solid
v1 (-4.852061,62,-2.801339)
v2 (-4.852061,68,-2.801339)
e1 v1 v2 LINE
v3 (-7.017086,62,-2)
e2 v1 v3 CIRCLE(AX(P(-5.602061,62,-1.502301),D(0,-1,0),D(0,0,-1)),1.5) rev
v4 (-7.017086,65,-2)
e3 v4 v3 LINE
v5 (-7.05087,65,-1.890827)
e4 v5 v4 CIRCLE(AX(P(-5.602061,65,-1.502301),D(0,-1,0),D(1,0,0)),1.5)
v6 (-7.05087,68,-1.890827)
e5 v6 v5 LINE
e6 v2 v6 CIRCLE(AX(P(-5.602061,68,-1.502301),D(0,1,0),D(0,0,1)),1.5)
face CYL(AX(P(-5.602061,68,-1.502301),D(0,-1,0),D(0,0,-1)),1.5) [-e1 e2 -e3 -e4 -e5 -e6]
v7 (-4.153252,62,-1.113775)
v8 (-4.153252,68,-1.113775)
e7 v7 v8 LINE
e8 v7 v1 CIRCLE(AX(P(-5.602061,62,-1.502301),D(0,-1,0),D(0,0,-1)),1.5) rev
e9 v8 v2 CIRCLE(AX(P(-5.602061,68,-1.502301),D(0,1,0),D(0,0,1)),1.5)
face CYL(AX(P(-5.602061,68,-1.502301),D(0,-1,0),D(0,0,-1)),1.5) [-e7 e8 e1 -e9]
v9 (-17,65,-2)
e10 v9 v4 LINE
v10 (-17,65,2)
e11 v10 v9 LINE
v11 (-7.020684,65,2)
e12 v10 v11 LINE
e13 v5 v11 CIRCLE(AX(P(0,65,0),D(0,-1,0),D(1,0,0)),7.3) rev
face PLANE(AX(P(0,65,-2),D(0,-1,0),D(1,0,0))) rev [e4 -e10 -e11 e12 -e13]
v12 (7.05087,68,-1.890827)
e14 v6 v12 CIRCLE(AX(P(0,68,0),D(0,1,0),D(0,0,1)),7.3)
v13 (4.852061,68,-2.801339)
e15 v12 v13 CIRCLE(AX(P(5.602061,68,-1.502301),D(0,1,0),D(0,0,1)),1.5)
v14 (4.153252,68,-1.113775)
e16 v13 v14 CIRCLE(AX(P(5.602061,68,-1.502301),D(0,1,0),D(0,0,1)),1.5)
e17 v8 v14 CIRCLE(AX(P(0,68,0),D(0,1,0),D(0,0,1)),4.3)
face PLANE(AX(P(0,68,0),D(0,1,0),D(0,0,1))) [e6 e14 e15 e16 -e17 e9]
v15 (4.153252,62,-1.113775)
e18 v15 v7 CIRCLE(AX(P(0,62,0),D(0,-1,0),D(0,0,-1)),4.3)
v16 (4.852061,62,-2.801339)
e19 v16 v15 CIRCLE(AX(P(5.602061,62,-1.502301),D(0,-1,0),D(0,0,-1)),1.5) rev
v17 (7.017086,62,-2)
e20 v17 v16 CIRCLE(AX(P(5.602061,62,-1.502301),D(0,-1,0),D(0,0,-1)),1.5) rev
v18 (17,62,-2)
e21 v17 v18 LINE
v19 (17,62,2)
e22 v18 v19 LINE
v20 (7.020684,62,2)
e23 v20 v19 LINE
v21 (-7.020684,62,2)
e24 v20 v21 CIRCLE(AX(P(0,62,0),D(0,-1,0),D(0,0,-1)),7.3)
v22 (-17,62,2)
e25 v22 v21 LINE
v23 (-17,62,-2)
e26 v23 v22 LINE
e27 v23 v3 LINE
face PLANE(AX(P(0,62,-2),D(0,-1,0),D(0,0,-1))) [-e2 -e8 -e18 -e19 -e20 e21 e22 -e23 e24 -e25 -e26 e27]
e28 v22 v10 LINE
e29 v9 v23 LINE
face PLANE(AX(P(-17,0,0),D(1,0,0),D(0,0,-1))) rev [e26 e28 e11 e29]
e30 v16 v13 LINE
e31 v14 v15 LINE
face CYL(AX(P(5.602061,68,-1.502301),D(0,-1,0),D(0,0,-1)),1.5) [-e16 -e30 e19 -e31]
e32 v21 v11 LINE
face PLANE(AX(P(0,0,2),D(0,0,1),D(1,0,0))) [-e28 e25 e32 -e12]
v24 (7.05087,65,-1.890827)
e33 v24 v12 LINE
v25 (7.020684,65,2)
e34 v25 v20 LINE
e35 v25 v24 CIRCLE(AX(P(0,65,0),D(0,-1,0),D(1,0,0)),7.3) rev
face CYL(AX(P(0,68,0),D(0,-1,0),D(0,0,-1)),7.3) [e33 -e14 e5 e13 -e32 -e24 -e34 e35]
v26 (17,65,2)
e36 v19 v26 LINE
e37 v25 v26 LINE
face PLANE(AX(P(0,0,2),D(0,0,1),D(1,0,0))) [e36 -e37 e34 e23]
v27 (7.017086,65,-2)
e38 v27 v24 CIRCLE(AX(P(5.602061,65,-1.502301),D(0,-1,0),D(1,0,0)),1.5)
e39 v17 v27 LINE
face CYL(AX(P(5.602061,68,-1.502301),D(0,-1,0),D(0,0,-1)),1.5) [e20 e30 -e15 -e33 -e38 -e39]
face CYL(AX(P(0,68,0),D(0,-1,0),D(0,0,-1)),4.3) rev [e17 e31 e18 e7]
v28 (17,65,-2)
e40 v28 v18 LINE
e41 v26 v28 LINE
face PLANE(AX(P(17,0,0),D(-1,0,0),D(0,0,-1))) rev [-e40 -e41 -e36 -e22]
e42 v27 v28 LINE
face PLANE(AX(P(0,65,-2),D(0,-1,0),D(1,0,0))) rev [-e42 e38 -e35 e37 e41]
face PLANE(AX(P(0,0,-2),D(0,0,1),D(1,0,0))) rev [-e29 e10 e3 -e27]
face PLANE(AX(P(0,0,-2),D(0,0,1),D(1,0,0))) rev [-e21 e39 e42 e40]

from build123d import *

# Parameters (mm, degrees)
SKETCH1_W                = 30
SKETCH1_H                = 30
BOSS_EXTRUDE1_DEPTH      = 5
SKETCH2_W                = 10
SKETCH2_H                = 10
BOSS_EXTRUDE2_DEPTH      = 50
SKETCH3_W                = 10
SKETCH3_H                = 3
SKETCH3_W_2              = 5
SKETCH3_H_2              = 7
SKETCH3_H_3              = 5
BOSS_EXTRUDE3_DEPTH      = 2
BOSS_EXTRUDE4_DEPTH      = 3
BOSS_EXTRUDE4_DEPTH_BACK = 5
SKETCH4_R                = 7.3
SKETCH4_R_2              = 4.3
CUT_EXTRUDE1_DEPTH       = 6
CUT_EXTRUDE1_DEPTH_BACK  = 5
SKETCH6_R                = 4.3
FILLET1_R                = 1.5
FILLET2_R                = 1.5
FILLET3_R                = 2
SKETCH7_W                = 39.438883959
SKETCH7_H                = 36.533940166
CUT_EXTRUDE2_DEPTH       = 80
SKETCH8_W                = 4
SKETCH8_H                = 3
BOSS_EXTRUDE5_DEPTH      = 2


with BuildPart() as part:
    # Sketch1 → Boss-Extrude1 (new body)
    with BuildSketch(Plane(origin=(0, 0, 0), x_dir=(1, 0, 0), z_dir=(0, 1, 0))):
        Rectangle(SKETCH1_W, SKETCH1_H)
    extrude(amount=BOSS_EXTRUDE1_DEPTH)

    # Sketch2 → Boss-Extrude2 (add)
    with BuildSketch(Plane(origin=(0, 5, 0), x_dir=(1, 0, 0), z_dir=(0, 1, 0))):
        Rectangle(SKETCH2_W, SKETCH2_H)
    extrude(amount=BOSS_EXTRUDE2_DEPTH)

    # Sketch3 → Boss-Extrude3 (add, symmetric)
    with BuildSketch(Plane.XY):
        with Locations((-5, 63.5)):
            Rectangle(SKETCH3_W, SKETCH3_H)
        with Locations((-12.5, 63.5)):
            Rectangle(SKETCH3_W_2, SKETCH3_H)
        with Locations((-12.5, 58.5)):
            Rectangle(SKETCH3_W_2, SKETCH3_H_2)
        with Locations((-12.5, 52.5)):
            Rectangle(SKETCH3_W_2, SKETCH3_H_3)
        with Locations((-7.5, 52.5)):
            Rectangle(SKETCH3_W_2, SKETCH3_H_3)
    boss_extrude3 = extrude(amount=BOSS_EXTRUDE3_DEPTH, both=True)

    # Mirror1: Boss-Extrude3 across plane
    add(boss_extrude3.mirror(Plane(origin=(0, 0, 0), x_dir=(0, 0, 1), z_dir=(1, 0, 0))))

    # Sketch4 → Boss-Extrude4 (add, two sides: drawn at the far end of the back side and taken through both)
    with BuildSketch(Plane(origin=(0, 65, 0), x_dir=(1, 0, 0), z_dir=(0, 1, 0)).offset(-BOSS_EXTRUDE4_DEPTH_BACK)):
        with Locations(Location((0, 0, 0), (0, 0, 270))):
            Circle(SKETCH4_R)
        with Locations(Location((0, 0, 0), (0, 0, 270))):
            Circle(SKETCH4_R_2, mode=Mode.SUBTRACT)
    extrude(amount=BOSS_EXTRUDE4_DEPTH + BOSS_EXTRUDE4_DEPTH_BACK)

    # Sketch6 → Cut-Extrude1 (cut, two sides: drawn at the far end of the back side and taken through both)
    with BuildSketch(Plane(origin=(0, 65, 0), x_dir=(1, 0, 0), z_dir=(0, 1, 0)).offset(-CUT_EXTRUDE1_DEPTH_BACK)):
        Circle(SKETCH6_R)
        with BuildLine():
            Line((-6.321985448, 3.65), (0, 0))
            Line((0, 0), (6.321985448, 3.65))
            ThreePointArc((6.321985448, 3.65), (0, 7.3), (-6.321985448, 3.65))
        make_face()
    extrude(amount=CUT_EXTRUDE1_DEPTH + CUT_EXTRUDE1_DEPTH_BACK, mode=Mode.SUBTRACT)

    # Fillet1
    # the kernel refuses this fillet: 1.5 mm, written as the material it takes off along each edge
    with BuildSketch(Plane(origin=(6.321985448, 55.239509531, -3.65), x_dir=(0.3827782883031586, 1.5487943038784236e-14, 0.923840236190059), z_dir=(0, 1, 0))) as fillet1_piece_1_section:
        with BuildLine():
            CenterArc((1.708559593, -1.487187387), FILLET1_R, 82.505882759, 104.988234482)
            Line((0.221372206, -1.682823981), (0, 0))
            ThreePointArc((0, 0), (0.952098094, 0.062354719), (1.904196188, 0))
        make_face()
    fillet1_piece_1 = extrude(amount=17.520980938, mode=Mode.PRIVATE)
    fillet1_piece_1 = split(fillet1_piece_1, bisect_by=Plane(origin=(7.049867501, 58.619754766, -2), z_dir=(0, 0, 1)), keep=Keep.TOP, mode=Mode.PRIVATE)
    fillet1_piece_1 = split(fillet1_piece_1, bisect_by=Plane(origin=(7.049867501, 62, -1.948339527), z_dir=(0, -1, 0)), keep=Keep.TOP, mode=Mode.PRIVATE)
    add(fillet1_piece_1, mode=Mode.SUBTRACT)
    with BuildSketch(Plane(origin=(6.321985448, 55.239509531, -3.65), x_dir=(0.3827782883031586, 1.5487943038784236e-14, 0.923840236190059), z_dir=(0, 1, 0))) as fillet1_piece_2_section:
        with BuildLine():
            CenterArc((1.708559593, -1.487187387), FILLET1_R, 82.505882759, 104.988234482)
            Line((0.221372206, -1.682823981), (0, 0))
            ThreePointArc((0, 0), (0.952098094, 0.062354719), (1.904196188, 0))
        make_face()
    fillet1_piece_2 = extrude(amount=17.520980938, mode=Mode.PRIVATE)
    fillet1_piece_2 = split(fillet1_piece_2, bisect_by=Plane(origin=(6.1871982, 58.619754766, -2), z_dir=(0, 0, -1)), keep=Keep.TOP, mode=Mode.PRIVATE)
    fillet1_piece_2 = split(fillet1_piece_2, bisect_by=Plane(origin=(6.1871982, 62, -3.070632647), z_dir=(0, -1, 0)), keep=Keep.TOP, mode=Mode.PRIVATE)
    add(fillet1_piece_2, mode=Mode.SUBTRACT)
    with BuildSketch(Plane(origin=(6.321985448, 55.239509531, -3.65), x_dir=(0.3827782883031586, 1.5487943038784236e-14, 0.923840236190059), z_dir=(0, 1, 0))) as fillet1_piece_3_section:
        with BuildLine():
            CenterArc((1.708559593, -1.487187387), FILLET1_R, 82.505882759, 104.988234482)
            Line((0.221372206, -1.682823981), (0, 0))
            ThreePointArc((0, 0), (0.952098094, 0.062354719), (1.904196188, 0))
        make_face()
    fillet1_piece_3 = extrude(amount=17.520980938, mode=Mode.PRIVATE)
    fillet1_piece_3 = split(fillet1_piece_3, bisect_by=Plane(origin=(6.1871982, 63.5, -2), z_dir=(0, 0, -1)), keep=Keep.TOP, mode=Mode.PRIVATE)
    fillet1_piece_3 = split(fillet1_piece_3, bisect_by=Plane(origin=(6.1871982, 65, -3.070632647), z_dir=(0, -1, 0)), keep=Keep.TOP, mode=Mode.PRIVATE)
    fillet1_piece_3 = split(fillet1_piece_3, bisect_by=Plane(origin=(6.1871982, 62, -3.070632647), z_dir=(0, 1, 0)), keep=Keep.TOP, mode=Mode.PRIVATE)
    add(fillet1_piece_3, mode=Mode.SUBTRACT)
    with BuildSketch(Plane(origin=(6.321985448, 55.239509531, -3.65), x_dir=(0.3827782883031586, 1.5487943038784236e-14, 0.923840236190059), z_dir=(0, 1, 0))) as fillet1_piece_4_section:
        with BuildLine():
            CenterArc((1.708559593, -1.487187387), FILLET1_R, 82.505882759, 104.988234482)
            Line((0.221372206, -1.682823981), (0, 0))
            ThreePointArc((0, 0), (0.952098094, 0.062354719), (1.904196188, 0))
        make_face()
    fillet1_piece_4 = extrude(amount=17.520980938, mode=Mode.PRIVATE)
    fillet1_piece_4 = split(fillet1_piece_4, bisect_by=Plane(origin=(7.049867501, 68.880245234, -2), z_dir=(0, 0, 1)), keep=Keep.TOP, mode=Mode.PRIVATE)
    fillet1_piece_4 = split(fillet1_piece_4, bisect_by=Plane(origin=(7.049867501, 65, -1.948339527), z_dir=(0, 1, 0)), keep=Keep.TOP, mode=Mode.PRIVATE)
    add(fillet1_piece_4, mode=Mode.SUBTRACT)
    with BuildSketch(Plane(origin=(6.321985448, 55.239509531, -3.65), x_dir=(0.3827782883031586, 1.5487943038784236e-14, 0.923840236190059), z_dir=(0, 1, 0))) as fillet1_piece_5_section:
        with BuildLine():
            CenterArc((1.708559593, -1.487187387), FILLET1_R, 82.505882759, 104.988234482)
            Line((0.221372206, -1.682823981), (0, 0))
            ThreePointArc((0, 0), (0.952098094, 0.062354719), (1.904196188, 0))
        make_face()
    fillet1_piece_5 = extrude(amount=17.520980938, mode=Mode.PRIVATE)
    fillet1_piece_5 = split(fillet1_piece_5, bisect_by=Plane(origin=(6.1871982, 68.880245234, -2), z_dir=(0, 0, -1)), keep=Keep.TOP, mode=Mode.PRIVATE)
    fillet1_piece_5 = split(fillet1_piece_5, bisect_by=Plane(origin=(6.1871982, 65, -3.070632647), z_dir=(0, 1, 0)), keep=Keep.TOP, mode=Mode.PRIVATE)
    add(fillet1_piece_5, mode=Mode.SUBTRACT)
    with BuildSketch(Plane(origin=(3.723909236, 56.743305172, -2.15), x_dir=(0.38277828830315935, 0, 0.9238402361900588), z_dir=(0, 1, 0))) as fillet1_piece_6:
        with BuildLine():
            CenterArc((1.317286404, 1.487187387), FILLET1_R, 187.494117241, 75.011765518)
            Line((-0.169900983, 1.291550792), (0, 0))
            ThreePointArc((0, 0), (0.560824905, 0.036729492), (1.121649809, 0))
        make_face()
    extrude(amount=14.513389656, mode=Mode.SUBTRACT)

    # Fillet2
    # the kernel refuses this fillet: 1.5 mm, written as the material it takes off along each edge
    with BuildSketch(Plane(origin=(-3.723909236, 71.256694828, -2.15), x_dir=(-0.38277828830315846, 0, 0.923840236190059), z_dir=(0, -1, 0))) as fillet2_piece_1:
        with BuildLine():
            CenterArc((1.317286404, 1.487187387), FILLET2_R, 187.494117241, 75.011765518)
            Line((-0.169900983, 1.291550792), (0, 0))
            ThreePointArc((0, 0), (0.560824905, 0.036729492), (1.121649809, 0))
        make_face()
    extrude(amount=14.513389656, mode=Mode.SUBTRACT)
    with BuildSketch(Plane(origin=(-6.321985448, 72.760490469, -3.65), x_dir=(0.8660254037844403, 0, 0.4999999999999975), z_dir=(0, -1, 0))) as fillet2_piece_2_section:
        with BuildLine():
            CenterArc((1.697322069, 1.5), FILLET2_R, 165.011765518, 104.988234482)
            ThreePointArc((0.248353638, 1.887931034), (0.062354719, 0.952098094), (0, 0))
            Line((0, 0), (1.697322069, 0))
        make_face()
    fillet2_piece_2 = extrude(amount=17.520980938, mode=Mode.PRIVATE)
    fillet2_piece_2 = split(fillet2_piece_2, bisect_by=Plane(origin=(-6.1871982, 68.880245234, -2), z_dir=(0, 0, -1)), keep=Keep.TOP, mode=Mode.PRIVATE)
    fillet2_piece_2 = split(fillet2_piece_2, bisect_by=Plane(origin=(-6.1871982, 65, -3.070632647), z_dir=(0, 1, 0)), keep=Keep.TOP, mode=Mode.PRIVATE)
    add(fillet2_piece_2, mode=Mode.SUBTRACT)
    with BuildSketch(Plane(origin=(-6.321985448, 72.760490469, -3.65), x_dir=(0.8660254037844403, 0, 0.4999999999999975), z_dir=(0, -1, 0))) as fillet2_piece_3_section:
        with BuildLine():
            CenterArc((1.697322069, 1.5), FILLET2_R, 165.011765518, 104.988234482)
            ThreePointArc((0.248353638, 1.887931034), (0.062354719, 0.952098094), (0, 0))
            Line((0, 0), (1.697322069, 0))
        make_face()
    fillet2_piece_3 = extrude(amount=17.520980938, mode=Mode.PRIVATE)
    fillet2_piece_3 = split(fillet2_piece_3, bisect_by=Plane(origin=(-7.049867501, 68.880245234, -2), z_dir=(0, 0, 1)), keep=Keep.TOP, mode=Mode.PRIVATE)
    fillet2_piece_3 = split(fillet2_piece_3, bisect_by=Plane(origin=(-7.049867501, 65, -1.948339527), z_dir=(0, 1, 0)), keep=Keep.TOP, mode=Mode.PRIVATE)
    add(fillet2_piece_3, mode=Mode.SUBTRACT)
    with BuildSketch(Plane(origin=(-6.321985448, 72.760490469, -3.65), x_dir=(0.8660254037844403, 0, 0.4999999999999975), z_dir=(0, -1, 0))) as fillet2_piece_4_section:
        with BuildLine():
            CenterArc((1.697322069, 1.5), FILLET2_R, 165.011765518, 104.988234482)
            ThreePointArc((0.248353638, 1.887931034), (0.062354719, 0.952098094), (0, 0))
            Line((0, 0), (1.697322069, 0))
        make_face()
    fillet2_piece_4 = extrude(amount=17.520980938, mode=Mode.PRIVATE)
    fillet2_piece_4 = split(fillet2_piece_4, bisect_by=Plane(origin=(-6.1871982, 62, -3.070632647), z_dir=(0, 1, 0)), keep=Keep.TOP, mode=Mode.PRIVATE)
    fillet2_piece_4 = split(fillet2_piece_4, bisect_by=Plane(origin=(-6.1871982, 63.5, -2), z_dir=(0, 0, -1)), keep=Keep.TOP, mode=Mode.PRIVATE)
    fillet2_piece_4 = split(fillet2_piece_4, bisect_by=Plane(origin=(-6.1871982, 65, -3.070632647), z_dir=(0, -1, 0)), keep=Keep.TOP, mode=Mode.PRIVATE)
    add(fillet2_piece_4, mode=Mode.SUBTRACT)
    with BuildSketch(Plane(origin=(-6.321985448, 72.760490469, -3.65), x_dir=(0.8660254037844403, 0, 0.4999999999999975), z_dir=(0, -1, 0))) as fillet2_piece_5_section:
        with BuildLine():
            CenterArc((1.697322069, 1.5), FILLET2_R, 165.011765518, 104.988234482)
            ThreePointArc((0.248353638, 1.887931034), (0.062354719, 0.952098094), (0, 0))
            Line((0, 0), (1.697322069, 0))
        make_face()
    fillet2_piece_5 = extrude(amount=17.520980938, mode=Mode.PRIVATE)
    fillet2_piece_5 = split(fillet2_piece_5, bisect_by=Plane(origin=(-6.1871982, 62, -3.070632647), z_dir=(0, -1, 0)), keep=Keep.TOP, mode=Mode.PRIVATE)
    fillet2_piece_5 = split(fillet2_piece_5, bisect_by=Plane(origin=(-6.1871982, 58.619754766, -2), z_dir=(0, 0, -1)), keep=Keep.TOP, mode=Mode.PRIVATE)
    add(fillet2_piece_5, mode=Mode.SUBTRACT)
    with BuildSketch(Plane(origin=(-6.321985448, 72.760490469, -3.65), x_dir=(0.8660254037844403, 0, 0.4999999999999975), z_dir=(0, -1, 0))) as fillet2_piece_6_section:
        with BuildLine():
            CenterArc((1.697322069, 1.5), FILLET2_R, 165.011765518, 104.988234482)
            ThreePointArc((0.248353638, 1.887931034), (0.062354719, 0.952098094), (0, 0))
            Line((0, 0), (1.697322069, 0))
        make_face()
    fillet2_piece_6 = extrude(amount=17.520980938, mode=Mode.PRIVATE)
    fillet2_piece_6 = split(fillet2_piece_6, bisect_by=Plane(origin=(-7.049867501, 62, -1.948339527), z_dir=(0, -1, 0)), keep=Keep.TOP, mode=Mode.PRIVATE)
    fillet2_piece_6 = split(fillet2_piece_6, bisect_by=Plane(origin=(-7.049867501, 58.619754766, -2), z_dir=(0, 0, 1)), keep=Keep.TOP, mode=Mode.PRIVATE)
    add(fillet2_piece_6, mode=Mode.SUBTRACT)

    # Fillet3
    fillet3_edges = [part.edges().sort_by_distance(p)[0] for p in [
        (0, 0, -15),
        (15, 0, 0),
        (0, 0, 15),
        (-15, 0, 0),
    ]]
    fillet(fillet3_edges, radius=FILLET3_R)

    # Sketch7 → Cut-Extrude2 (cut)
    with BuildSketch(Plane.XZ.offset(-62)):
        with Locations((1.010233487, -0.46607454)):
            Rectangle(SKETCH7_W, SKETCH7_H)
    extrude(amount=CUT_EXTRUDE2_DEPTH, mode=Mode.SUBTRACT)

    # Sketch8 → Boss-Extrude5 (add)
    with BuildSketch(Plane.ZY.offset(15)):
        with Locations((0, 63.5)):
            Rectangle(SKETCH8_W, SKETCH8_H)
    boss_extrude5 = extrude(amount=BOSS_EXTRUDE5_DEPTH)

    # Mirror3: Boss-Extrude5 across plane
    add(boss_extrude5.mirror(Plane(origin=(0, 0, 0), x_dir=(0, 0, 1), z_dir=(1, 0, 0))))


solid = part.part
